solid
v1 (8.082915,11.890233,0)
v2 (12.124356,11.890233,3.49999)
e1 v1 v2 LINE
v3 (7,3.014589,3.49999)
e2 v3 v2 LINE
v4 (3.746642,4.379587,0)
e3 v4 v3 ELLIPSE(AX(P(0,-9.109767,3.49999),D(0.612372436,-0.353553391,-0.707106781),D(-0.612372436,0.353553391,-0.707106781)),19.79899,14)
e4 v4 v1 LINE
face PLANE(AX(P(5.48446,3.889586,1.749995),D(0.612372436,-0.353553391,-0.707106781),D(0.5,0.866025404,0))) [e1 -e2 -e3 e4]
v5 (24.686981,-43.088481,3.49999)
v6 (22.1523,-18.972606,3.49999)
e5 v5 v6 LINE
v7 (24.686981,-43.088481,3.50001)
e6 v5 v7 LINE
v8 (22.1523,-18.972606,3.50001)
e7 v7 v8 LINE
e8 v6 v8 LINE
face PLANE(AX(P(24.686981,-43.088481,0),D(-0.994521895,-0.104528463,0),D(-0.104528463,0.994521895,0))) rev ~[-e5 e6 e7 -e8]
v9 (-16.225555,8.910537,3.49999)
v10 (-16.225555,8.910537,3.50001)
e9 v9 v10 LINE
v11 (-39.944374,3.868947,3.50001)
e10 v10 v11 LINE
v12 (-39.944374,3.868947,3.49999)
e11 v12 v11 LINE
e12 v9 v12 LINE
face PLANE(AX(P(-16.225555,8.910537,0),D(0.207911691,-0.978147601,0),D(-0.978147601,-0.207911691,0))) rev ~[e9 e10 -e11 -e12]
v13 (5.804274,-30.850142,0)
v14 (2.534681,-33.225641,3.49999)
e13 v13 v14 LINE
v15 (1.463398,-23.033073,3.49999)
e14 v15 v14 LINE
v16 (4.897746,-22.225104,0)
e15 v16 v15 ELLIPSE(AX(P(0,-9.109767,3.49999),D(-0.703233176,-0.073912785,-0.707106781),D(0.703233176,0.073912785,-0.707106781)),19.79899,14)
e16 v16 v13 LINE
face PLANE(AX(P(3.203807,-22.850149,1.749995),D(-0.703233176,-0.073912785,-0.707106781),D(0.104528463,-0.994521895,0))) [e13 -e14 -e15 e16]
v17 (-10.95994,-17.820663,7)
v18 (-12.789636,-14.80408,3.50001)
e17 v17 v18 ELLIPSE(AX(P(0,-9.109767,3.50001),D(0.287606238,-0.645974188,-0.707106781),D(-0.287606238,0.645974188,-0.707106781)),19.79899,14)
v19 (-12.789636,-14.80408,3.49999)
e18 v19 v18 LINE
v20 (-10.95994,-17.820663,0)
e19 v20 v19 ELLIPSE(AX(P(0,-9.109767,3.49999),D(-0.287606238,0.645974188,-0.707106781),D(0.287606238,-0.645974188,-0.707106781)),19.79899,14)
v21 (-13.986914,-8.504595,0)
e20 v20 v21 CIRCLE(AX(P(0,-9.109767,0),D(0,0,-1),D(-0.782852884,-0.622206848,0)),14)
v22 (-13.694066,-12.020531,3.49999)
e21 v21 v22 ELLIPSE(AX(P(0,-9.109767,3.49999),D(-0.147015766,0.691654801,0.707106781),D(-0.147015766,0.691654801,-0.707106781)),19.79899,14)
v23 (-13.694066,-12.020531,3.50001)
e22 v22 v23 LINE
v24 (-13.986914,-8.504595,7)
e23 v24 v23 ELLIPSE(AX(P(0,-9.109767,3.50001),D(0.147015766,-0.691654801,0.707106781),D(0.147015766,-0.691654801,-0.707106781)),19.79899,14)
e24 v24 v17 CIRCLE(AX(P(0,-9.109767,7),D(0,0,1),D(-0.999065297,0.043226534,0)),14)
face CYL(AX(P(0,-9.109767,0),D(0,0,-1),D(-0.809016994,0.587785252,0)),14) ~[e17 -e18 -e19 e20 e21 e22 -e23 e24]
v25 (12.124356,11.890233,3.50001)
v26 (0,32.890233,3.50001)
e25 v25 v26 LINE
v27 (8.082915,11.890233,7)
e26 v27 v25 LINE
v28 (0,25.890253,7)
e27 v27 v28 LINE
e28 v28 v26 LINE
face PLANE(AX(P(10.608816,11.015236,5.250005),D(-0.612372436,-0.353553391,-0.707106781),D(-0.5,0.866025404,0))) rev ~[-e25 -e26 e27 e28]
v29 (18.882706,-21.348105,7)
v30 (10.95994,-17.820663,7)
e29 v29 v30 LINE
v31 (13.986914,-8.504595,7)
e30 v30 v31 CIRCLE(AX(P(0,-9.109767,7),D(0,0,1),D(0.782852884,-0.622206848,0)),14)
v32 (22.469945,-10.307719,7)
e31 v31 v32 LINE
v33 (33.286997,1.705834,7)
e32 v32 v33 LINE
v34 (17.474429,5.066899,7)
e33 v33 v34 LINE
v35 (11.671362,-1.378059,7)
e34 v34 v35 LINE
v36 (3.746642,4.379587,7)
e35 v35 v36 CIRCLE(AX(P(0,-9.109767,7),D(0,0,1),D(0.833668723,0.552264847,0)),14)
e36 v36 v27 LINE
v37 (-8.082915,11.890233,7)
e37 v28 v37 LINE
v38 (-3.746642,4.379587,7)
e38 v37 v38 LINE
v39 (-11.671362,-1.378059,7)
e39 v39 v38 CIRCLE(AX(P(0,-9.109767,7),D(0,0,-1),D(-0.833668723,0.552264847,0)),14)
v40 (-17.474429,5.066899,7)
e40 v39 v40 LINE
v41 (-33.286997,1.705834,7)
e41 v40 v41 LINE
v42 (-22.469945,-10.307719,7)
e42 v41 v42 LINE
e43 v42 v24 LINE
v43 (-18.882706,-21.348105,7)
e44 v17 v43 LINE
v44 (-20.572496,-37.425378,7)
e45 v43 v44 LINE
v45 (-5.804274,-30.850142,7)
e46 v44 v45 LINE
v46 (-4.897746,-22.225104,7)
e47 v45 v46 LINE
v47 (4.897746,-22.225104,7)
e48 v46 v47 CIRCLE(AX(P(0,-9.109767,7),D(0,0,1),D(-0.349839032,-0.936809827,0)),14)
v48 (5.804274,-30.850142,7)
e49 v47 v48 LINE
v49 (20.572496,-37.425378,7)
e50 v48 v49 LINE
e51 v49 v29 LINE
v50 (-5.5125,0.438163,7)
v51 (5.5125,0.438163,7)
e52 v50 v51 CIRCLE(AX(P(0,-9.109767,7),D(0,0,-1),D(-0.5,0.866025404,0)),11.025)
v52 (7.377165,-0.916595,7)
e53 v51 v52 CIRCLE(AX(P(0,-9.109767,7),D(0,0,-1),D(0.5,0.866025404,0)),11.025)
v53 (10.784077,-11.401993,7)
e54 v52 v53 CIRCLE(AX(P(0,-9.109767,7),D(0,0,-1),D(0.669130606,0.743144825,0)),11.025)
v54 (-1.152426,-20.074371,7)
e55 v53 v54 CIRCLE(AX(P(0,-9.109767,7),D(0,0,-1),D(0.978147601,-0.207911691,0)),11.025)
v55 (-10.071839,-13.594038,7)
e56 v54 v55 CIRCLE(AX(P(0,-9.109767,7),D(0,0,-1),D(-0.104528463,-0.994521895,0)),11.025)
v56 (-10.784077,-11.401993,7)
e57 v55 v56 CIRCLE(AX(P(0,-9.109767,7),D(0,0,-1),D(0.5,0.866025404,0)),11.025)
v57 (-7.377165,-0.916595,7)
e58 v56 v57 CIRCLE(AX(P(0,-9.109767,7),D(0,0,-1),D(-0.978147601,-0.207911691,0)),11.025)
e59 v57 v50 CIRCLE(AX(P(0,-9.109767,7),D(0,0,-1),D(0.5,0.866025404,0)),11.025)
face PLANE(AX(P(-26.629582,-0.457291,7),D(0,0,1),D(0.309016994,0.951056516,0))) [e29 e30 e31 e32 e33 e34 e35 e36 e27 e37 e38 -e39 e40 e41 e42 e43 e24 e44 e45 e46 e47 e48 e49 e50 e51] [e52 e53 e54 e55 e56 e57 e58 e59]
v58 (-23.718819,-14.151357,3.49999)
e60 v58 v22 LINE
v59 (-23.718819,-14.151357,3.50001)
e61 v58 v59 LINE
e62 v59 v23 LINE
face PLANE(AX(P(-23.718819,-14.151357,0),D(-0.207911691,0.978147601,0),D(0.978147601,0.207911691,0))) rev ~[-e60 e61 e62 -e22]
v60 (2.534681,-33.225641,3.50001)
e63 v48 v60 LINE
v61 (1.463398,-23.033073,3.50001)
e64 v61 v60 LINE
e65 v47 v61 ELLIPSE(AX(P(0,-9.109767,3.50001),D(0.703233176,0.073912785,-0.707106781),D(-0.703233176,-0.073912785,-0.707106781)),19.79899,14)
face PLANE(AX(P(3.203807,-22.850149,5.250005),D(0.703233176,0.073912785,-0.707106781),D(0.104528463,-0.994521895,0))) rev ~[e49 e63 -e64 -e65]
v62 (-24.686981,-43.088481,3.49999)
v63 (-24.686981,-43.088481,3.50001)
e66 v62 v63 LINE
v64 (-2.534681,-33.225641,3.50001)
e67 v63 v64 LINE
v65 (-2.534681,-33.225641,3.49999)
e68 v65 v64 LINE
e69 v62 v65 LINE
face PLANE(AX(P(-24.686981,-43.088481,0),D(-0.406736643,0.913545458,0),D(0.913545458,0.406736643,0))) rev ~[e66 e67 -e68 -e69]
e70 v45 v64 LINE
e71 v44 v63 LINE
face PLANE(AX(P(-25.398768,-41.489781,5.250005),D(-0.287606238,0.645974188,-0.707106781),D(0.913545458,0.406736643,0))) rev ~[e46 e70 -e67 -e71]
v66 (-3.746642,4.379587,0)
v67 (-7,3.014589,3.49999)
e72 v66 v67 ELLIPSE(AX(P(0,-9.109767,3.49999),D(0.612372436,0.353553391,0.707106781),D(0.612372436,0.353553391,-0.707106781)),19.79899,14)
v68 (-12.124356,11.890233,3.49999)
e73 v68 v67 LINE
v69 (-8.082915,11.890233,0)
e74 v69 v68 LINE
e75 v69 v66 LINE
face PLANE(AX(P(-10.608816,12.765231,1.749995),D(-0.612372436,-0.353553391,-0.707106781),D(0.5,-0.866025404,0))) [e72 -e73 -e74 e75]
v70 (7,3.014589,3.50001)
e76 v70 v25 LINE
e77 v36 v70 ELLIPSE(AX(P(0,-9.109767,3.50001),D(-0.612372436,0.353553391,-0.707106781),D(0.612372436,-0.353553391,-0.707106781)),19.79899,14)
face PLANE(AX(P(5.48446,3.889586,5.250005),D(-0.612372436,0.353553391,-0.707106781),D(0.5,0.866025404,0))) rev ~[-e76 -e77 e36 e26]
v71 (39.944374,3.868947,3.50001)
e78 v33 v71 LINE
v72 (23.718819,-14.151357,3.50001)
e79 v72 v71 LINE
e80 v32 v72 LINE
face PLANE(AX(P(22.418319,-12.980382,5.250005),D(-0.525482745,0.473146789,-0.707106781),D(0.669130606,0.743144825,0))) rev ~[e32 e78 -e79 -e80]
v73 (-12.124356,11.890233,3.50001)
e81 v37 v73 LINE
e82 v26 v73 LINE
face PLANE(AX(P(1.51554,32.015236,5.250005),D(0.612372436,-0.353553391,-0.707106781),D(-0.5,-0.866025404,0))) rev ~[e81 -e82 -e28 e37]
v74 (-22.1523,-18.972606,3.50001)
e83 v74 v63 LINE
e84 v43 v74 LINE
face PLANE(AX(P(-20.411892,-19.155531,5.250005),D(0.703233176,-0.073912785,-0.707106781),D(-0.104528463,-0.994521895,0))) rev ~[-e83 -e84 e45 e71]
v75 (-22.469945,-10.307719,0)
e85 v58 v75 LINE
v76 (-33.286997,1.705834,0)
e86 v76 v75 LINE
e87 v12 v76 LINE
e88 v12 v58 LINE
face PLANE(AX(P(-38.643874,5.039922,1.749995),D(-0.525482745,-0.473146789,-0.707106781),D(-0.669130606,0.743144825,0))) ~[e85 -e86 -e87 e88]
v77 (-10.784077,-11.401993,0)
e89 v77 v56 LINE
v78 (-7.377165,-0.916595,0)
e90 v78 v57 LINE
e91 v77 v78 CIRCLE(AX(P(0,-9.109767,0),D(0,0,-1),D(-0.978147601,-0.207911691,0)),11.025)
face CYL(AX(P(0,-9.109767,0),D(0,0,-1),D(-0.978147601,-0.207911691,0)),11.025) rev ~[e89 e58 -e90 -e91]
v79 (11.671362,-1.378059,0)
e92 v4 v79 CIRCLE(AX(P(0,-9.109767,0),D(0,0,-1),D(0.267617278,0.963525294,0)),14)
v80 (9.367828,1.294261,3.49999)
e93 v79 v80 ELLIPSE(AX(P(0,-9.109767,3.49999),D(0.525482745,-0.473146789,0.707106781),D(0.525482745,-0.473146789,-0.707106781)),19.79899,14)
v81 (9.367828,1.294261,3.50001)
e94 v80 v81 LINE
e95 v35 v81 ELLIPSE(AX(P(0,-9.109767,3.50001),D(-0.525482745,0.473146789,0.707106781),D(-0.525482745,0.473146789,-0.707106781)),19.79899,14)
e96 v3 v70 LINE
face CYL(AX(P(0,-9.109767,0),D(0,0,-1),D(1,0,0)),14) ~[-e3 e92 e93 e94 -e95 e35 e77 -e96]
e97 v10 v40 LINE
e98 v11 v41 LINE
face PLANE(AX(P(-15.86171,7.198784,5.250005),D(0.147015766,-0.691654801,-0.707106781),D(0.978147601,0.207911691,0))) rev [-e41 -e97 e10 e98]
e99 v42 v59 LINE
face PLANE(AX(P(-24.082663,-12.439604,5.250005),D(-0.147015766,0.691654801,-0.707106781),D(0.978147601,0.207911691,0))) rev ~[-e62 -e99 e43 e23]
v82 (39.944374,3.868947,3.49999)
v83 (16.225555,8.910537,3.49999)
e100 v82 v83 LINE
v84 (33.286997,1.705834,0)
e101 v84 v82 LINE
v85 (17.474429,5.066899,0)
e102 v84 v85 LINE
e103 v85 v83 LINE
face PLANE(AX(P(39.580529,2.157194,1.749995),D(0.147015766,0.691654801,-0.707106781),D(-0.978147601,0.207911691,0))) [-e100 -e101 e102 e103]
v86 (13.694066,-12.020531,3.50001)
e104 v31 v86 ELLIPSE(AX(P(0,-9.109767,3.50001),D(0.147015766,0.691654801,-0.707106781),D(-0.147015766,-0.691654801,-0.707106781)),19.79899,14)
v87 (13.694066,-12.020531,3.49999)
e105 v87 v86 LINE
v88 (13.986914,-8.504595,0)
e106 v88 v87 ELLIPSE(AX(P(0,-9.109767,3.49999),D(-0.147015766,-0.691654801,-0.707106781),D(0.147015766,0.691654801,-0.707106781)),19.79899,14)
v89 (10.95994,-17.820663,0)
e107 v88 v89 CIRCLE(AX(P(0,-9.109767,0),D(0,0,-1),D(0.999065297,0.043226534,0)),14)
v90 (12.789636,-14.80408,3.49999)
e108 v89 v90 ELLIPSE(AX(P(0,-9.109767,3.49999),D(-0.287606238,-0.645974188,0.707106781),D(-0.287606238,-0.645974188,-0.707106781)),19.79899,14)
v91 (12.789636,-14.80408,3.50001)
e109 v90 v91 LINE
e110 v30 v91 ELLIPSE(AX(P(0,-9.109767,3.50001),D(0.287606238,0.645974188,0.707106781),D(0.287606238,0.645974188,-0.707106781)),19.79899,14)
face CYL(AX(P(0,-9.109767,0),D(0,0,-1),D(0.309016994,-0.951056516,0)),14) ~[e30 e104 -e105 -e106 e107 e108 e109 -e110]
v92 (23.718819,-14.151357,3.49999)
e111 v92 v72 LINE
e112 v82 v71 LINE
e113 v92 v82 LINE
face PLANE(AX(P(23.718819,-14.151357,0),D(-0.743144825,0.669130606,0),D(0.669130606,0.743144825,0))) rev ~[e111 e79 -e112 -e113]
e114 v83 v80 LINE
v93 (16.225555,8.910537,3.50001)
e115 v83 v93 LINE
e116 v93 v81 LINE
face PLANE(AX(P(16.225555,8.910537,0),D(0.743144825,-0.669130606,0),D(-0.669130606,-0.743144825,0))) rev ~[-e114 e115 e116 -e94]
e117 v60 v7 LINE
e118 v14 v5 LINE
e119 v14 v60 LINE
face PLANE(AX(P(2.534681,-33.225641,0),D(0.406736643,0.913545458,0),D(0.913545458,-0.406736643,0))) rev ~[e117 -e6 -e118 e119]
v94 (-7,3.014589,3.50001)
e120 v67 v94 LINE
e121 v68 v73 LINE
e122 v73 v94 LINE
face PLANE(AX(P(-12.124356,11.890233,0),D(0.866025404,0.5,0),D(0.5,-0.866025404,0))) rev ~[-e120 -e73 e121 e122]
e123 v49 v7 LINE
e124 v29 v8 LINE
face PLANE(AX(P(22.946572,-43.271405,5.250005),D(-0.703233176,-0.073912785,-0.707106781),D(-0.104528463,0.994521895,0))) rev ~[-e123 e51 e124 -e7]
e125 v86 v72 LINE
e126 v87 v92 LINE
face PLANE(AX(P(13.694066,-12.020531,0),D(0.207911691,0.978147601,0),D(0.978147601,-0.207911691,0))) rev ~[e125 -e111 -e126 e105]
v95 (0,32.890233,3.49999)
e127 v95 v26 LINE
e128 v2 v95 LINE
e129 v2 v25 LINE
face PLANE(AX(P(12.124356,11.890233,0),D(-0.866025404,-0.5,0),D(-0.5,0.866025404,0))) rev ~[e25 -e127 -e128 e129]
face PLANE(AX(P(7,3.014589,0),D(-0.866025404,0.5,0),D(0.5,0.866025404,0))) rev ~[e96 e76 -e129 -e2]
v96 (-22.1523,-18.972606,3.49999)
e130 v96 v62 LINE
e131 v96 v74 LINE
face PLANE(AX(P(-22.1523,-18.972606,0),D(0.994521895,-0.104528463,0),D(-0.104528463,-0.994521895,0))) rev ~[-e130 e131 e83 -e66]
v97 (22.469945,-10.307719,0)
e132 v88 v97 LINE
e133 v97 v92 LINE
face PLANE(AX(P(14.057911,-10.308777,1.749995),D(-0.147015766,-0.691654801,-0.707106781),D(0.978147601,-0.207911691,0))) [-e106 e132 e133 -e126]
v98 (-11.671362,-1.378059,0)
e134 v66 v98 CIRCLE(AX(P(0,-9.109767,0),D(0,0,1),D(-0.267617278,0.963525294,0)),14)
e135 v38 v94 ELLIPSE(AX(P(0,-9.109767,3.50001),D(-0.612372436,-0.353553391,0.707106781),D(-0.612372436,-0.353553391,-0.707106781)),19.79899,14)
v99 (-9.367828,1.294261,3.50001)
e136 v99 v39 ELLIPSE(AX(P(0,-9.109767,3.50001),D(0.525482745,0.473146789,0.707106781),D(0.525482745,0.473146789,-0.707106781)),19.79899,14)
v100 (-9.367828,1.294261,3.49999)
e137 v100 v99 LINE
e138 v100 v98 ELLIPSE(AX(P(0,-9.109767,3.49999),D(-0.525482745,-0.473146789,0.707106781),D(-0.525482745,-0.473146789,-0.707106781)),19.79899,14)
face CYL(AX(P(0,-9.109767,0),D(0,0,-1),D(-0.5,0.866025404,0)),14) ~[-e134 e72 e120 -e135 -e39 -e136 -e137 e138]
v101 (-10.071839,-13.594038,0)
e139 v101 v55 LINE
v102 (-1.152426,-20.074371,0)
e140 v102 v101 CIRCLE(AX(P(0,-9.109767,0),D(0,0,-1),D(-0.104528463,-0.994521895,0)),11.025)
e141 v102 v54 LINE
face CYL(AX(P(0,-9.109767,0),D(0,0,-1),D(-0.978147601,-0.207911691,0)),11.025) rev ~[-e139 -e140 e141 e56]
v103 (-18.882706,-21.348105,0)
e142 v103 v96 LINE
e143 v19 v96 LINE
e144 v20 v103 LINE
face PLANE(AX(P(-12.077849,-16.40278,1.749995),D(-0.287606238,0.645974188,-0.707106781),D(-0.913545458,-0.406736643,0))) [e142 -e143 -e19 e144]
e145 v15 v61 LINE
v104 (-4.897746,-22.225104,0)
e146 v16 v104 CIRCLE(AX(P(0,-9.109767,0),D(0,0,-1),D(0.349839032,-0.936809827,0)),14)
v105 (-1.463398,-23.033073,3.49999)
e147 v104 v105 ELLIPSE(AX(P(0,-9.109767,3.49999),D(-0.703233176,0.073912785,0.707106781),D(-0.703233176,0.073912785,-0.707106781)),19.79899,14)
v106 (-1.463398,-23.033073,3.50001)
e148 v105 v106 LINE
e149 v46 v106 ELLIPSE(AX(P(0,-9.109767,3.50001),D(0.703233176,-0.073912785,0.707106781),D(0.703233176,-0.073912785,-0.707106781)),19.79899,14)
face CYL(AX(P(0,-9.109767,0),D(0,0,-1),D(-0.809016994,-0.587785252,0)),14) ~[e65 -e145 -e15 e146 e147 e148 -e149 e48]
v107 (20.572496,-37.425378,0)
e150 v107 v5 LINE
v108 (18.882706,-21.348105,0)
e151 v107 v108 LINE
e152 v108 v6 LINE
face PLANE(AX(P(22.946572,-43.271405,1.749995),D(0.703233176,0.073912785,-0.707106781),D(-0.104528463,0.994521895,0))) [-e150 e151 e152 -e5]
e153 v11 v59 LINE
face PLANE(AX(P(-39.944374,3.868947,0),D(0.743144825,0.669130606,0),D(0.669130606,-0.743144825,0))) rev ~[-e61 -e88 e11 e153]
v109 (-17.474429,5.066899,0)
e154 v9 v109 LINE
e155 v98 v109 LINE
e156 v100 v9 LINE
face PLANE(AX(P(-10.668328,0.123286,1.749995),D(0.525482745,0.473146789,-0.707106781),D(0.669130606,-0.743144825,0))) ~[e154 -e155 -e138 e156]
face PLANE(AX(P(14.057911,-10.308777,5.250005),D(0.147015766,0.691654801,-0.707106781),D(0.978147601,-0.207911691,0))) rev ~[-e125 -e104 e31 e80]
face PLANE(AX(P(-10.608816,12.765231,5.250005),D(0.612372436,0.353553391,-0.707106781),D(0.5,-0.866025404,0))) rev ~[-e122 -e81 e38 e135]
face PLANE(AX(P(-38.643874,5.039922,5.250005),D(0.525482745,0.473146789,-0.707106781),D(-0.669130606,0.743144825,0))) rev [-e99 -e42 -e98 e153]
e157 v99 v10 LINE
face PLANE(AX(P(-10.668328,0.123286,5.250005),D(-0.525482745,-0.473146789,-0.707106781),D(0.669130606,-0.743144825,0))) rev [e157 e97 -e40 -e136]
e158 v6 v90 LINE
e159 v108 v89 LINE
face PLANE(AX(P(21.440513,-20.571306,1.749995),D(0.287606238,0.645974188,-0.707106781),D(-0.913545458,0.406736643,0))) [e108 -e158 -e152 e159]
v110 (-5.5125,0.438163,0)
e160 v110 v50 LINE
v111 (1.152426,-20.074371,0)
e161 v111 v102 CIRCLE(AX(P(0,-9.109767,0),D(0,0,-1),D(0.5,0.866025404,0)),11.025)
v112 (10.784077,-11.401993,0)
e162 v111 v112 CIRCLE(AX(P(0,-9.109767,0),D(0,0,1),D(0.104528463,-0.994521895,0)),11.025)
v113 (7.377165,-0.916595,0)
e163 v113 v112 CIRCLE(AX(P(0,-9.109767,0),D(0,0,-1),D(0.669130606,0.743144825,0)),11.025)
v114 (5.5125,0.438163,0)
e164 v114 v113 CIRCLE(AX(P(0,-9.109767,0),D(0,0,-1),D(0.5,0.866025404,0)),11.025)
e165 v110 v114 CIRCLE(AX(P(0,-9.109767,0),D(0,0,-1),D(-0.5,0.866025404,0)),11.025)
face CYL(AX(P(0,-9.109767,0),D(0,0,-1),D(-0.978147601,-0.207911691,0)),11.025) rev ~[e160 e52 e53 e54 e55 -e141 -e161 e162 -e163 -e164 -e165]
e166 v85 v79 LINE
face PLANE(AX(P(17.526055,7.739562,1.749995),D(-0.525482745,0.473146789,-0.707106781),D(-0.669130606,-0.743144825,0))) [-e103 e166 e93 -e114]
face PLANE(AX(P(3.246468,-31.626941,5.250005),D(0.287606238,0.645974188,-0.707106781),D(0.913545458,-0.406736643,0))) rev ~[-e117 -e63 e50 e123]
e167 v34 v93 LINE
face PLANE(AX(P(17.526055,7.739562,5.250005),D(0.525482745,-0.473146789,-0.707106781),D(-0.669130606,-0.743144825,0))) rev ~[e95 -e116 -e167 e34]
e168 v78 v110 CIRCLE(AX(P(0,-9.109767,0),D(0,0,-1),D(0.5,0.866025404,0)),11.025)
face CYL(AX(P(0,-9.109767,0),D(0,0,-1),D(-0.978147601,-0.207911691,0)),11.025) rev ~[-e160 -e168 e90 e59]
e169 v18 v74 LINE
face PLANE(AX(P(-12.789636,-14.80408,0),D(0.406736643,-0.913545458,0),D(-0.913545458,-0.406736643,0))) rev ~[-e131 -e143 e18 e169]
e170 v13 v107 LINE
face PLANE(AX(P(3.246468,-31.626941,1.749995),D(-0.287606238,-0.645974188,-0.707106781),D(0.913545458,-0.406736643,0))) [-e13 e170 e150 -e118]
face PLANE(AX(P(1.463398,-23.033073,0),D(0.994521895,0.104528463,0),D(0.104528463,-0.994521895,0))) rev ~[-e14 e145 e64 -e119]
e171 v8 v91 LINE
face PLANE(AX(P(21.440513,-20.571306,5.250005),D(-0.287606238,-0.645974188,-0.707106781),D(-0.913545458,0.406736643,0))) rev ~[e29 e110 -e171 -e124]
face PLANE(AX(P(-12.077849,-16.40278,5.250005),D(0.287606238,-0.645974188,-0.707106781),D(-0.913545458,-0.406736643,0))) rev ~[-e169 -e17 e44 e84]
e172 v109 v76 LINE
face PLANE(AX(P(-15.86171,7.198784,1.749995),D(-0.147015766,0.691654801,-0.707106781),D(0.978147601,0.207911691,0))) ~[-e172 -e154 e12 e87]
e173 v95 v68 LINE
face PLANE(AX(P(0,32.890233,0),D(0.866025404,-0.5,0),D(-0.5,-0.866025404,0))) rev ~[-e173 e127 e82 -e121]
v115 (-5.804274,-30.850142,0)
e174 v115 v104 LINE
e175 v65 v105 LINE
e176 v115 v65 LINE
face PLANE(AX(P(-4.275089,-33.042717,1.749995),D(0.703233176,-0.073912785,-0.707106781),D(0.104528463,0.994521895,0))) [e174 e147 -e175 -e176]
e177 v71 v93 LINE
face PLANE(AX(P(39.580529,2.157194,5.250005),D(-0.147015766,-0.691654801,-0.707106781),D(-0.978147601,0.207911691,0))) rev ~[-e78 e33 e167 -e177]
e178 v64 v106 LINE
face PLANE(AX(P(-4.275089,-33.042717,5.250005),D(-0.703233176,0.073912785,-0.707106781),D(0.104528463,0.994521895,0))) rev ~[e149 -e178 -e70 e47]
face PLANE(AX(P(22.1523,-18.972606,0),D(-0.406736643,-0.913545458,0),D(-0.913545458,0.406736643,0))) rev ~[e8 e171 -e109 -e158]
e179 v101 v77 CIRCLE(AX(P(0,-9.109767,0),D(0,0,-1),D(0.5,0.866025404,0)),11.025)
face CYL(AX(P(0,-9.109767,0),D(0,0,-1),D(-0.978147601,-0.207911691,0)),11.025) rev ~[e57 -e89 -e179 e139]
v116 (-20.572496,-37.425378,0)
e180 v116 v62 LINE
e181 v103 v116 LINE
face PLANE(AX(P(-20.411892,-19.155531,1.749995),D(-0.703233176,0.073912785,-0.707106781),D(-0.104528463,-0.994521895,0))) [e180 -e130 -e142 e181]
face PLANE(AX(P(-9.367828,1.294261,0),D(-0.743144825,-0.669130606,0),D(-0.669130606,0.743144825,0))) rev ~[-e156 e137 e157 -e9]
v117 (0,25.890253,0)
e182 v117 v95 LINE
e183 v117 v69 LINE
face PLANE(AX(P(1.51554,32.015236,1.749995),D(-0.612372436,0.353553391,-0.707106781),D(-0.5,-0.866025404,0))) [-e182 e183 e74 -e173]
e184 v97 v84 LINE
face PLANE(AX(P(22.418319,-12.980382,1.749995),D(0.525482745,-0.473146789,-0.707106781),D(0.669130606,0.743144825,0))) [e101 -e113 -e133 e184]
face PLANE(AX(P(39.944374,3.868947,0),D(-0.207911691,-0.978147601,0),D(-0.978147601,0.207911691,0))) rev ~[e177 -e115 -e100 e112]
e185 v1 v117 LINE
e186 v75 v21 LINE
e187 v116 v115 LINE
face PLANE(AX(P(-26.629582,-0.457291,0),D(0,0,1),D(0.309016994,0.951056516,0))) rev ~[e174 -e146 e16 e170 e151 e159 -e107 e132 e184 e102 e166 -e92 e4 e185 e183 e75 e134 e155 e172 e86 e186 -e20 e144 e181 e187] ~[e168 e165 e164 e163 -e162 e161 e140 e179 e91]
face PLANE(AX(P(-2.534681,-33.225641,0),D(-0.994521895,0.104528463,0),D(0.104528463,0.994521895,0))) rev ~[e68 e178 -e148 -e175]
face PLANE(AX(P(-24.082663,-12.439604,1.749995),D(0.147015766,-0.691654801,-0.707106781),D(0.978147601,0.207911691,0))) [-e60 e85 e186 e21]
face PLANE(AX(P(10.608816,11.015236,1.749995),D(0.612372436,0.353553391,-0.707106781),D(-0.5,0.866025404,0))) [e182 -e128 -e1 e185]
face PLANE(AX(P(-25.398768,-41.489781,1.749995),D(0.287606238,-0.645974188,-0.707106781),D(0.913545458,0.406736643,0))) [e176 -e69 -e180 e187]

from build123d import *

# Parameters (mm, degrees)
F1_DEPTH = 7
F2_COUNT = 5
F3_SIZE  = 3.49999


# Not quite as in the source:
# - a fillet or chamfer is up to 0.001 mm smaller than in the source, because OpenCascade refuses the exact size


with BuildPart() as f1:
    # F0 (on Top) → F1 (new body)
    with BuildSketch(Plane.XY):
        Polygon((-12.124355653, 11.8902331595), (12.124355653, 11.8902331595), (0, 32.8902331595), align=None)
        with BuildLine():
            Line((7, 3.0145888124), (12.124355653, 11.8902331595))
            Line((12.124355653, 11.8902331595), (-12.124355653, 11.8902331595))
            Line((-12.124355653, 11.8902331595), (-7, 3.0145888124))
            ThreePointArc((-7, 3.0145888124), (0, 4.8902331595), (7, 3.0145888124))
        make_face()
        with BuildLine():
            Line((5.5125, 0.4381632362), (7, 3.0145888124))
            ThreePointArc((7, 3.0145888124), (0, 4.8902331595), (-7, 3.0145888124))
            Line((-7, 3.0145888124), (-5.5125, 0.4381632362))
            ThreePointArc((-5.5125, 0.4381632362), (0, 1.9152331595), (5.5125, 0.4381632362))
        make_face()
        with BuildLine():
            ThreePointArc((14, -9.1097668405), (12.124355653, -2.1097668405), (7, 3.0145888124))
            Line((7, 3.0145888124), (5.5125, 0.4381632362))
            ThreePointArc((5.5125, 0.4381632362), (9.5479300767, -3.5972668405), (11.025, -9.1097668405))
            ThreePointArc((11.025, -9.1097668405), (-5.5125, -18.6576969173), (-5.5125, 0.4381632362))
            Line((-5.5125, 0.4381632362), (-7, 3.0145888124))
            ThreePointArc((-7, 3.0145888124), (-7, -21.2341224935), (14, -9.1097668405))
        make_face()
    extrude(amount=F1_DEPTH)

    # F2: F1 ×5 about axis
    f2_axis = Axis((0, -9.1097668405, 0), (0, 0, -1))


with BuildPart() as f1_1:
    add(f1.part)
    for i in range(1, F2_COUNT):
        add(f1.part.rotate(f2_axis, i * 360 / F2_COUNT))

    # F3 (size 3.5 in the source; OpenCascade refuses exactly that, so slightly less here)
    f3_edges = [f1_1.edges().sort_by_distance(p)[0] for p in [
        (-13.610831, -38.157061, 7),
        (-23.41964, -31.030543, 7),
        (-18.706443, -13.085944, 7),
        (-17.470968, -16.888343, 7),
        (-31.831596, -5.141205, 7),
        (-28.084964, 6.389742, 7),
        (-9.562178, 7.452411, 7),
        (-12.796692, 5.102399, 7),
        (-6.062178, 22.390233, 7),
        (6.062178, 22.390233, 7),
        (9.562178, 7.452411, 7),
        (12.796692, 5.102399, 7),
        (28.084964, 6.389742, 7),
        (31.831596, -5.141205, 7),
        (18.706443, -13.085944, 7),
        (17.470968, -16.888343, 7),
        (23.41964, -31.030543, 7),
        (13.610831, -38.157061, 7),
        (1.99904, -28.129357, 7),
        (-1.99904, -28.129357, 7),
        (-13.610831, -38.157061, 0),
        (-23.41964, -31.030543, 0),
        (-1.99904, -28.129357, 0),
        (1.99904, -28.129357, 0),
        (13.610831, -38.157061, 0),
        (23.41964, -31.030543, 0),
        (17.470968, -16.888343, 0),
        (18.706443, -13.085944, 0),
        (31.831596, -5.141205, 0),
        (28.084964, 6.389742, 0),
        (12.796692, 5.102399, 0),
        (9.562178, 7.452411, 0),
        (6.062178, 22.390233, 0),
        (-6.062178, 22.390233, 0),
        (-9.562178, 7.452411, 0),
        (-12.796692, 5.102399, 0),
        (-28.084964, 6.389742, 0),
        (-31.831596, -5.141205, 0),
        (-18.706443, -13.085944, 0),
        (-17.470968, -16.888343, 0),
    ]]
    chamfer(f3_edges, length=F3_SIZE)


solid = f1_1.part
